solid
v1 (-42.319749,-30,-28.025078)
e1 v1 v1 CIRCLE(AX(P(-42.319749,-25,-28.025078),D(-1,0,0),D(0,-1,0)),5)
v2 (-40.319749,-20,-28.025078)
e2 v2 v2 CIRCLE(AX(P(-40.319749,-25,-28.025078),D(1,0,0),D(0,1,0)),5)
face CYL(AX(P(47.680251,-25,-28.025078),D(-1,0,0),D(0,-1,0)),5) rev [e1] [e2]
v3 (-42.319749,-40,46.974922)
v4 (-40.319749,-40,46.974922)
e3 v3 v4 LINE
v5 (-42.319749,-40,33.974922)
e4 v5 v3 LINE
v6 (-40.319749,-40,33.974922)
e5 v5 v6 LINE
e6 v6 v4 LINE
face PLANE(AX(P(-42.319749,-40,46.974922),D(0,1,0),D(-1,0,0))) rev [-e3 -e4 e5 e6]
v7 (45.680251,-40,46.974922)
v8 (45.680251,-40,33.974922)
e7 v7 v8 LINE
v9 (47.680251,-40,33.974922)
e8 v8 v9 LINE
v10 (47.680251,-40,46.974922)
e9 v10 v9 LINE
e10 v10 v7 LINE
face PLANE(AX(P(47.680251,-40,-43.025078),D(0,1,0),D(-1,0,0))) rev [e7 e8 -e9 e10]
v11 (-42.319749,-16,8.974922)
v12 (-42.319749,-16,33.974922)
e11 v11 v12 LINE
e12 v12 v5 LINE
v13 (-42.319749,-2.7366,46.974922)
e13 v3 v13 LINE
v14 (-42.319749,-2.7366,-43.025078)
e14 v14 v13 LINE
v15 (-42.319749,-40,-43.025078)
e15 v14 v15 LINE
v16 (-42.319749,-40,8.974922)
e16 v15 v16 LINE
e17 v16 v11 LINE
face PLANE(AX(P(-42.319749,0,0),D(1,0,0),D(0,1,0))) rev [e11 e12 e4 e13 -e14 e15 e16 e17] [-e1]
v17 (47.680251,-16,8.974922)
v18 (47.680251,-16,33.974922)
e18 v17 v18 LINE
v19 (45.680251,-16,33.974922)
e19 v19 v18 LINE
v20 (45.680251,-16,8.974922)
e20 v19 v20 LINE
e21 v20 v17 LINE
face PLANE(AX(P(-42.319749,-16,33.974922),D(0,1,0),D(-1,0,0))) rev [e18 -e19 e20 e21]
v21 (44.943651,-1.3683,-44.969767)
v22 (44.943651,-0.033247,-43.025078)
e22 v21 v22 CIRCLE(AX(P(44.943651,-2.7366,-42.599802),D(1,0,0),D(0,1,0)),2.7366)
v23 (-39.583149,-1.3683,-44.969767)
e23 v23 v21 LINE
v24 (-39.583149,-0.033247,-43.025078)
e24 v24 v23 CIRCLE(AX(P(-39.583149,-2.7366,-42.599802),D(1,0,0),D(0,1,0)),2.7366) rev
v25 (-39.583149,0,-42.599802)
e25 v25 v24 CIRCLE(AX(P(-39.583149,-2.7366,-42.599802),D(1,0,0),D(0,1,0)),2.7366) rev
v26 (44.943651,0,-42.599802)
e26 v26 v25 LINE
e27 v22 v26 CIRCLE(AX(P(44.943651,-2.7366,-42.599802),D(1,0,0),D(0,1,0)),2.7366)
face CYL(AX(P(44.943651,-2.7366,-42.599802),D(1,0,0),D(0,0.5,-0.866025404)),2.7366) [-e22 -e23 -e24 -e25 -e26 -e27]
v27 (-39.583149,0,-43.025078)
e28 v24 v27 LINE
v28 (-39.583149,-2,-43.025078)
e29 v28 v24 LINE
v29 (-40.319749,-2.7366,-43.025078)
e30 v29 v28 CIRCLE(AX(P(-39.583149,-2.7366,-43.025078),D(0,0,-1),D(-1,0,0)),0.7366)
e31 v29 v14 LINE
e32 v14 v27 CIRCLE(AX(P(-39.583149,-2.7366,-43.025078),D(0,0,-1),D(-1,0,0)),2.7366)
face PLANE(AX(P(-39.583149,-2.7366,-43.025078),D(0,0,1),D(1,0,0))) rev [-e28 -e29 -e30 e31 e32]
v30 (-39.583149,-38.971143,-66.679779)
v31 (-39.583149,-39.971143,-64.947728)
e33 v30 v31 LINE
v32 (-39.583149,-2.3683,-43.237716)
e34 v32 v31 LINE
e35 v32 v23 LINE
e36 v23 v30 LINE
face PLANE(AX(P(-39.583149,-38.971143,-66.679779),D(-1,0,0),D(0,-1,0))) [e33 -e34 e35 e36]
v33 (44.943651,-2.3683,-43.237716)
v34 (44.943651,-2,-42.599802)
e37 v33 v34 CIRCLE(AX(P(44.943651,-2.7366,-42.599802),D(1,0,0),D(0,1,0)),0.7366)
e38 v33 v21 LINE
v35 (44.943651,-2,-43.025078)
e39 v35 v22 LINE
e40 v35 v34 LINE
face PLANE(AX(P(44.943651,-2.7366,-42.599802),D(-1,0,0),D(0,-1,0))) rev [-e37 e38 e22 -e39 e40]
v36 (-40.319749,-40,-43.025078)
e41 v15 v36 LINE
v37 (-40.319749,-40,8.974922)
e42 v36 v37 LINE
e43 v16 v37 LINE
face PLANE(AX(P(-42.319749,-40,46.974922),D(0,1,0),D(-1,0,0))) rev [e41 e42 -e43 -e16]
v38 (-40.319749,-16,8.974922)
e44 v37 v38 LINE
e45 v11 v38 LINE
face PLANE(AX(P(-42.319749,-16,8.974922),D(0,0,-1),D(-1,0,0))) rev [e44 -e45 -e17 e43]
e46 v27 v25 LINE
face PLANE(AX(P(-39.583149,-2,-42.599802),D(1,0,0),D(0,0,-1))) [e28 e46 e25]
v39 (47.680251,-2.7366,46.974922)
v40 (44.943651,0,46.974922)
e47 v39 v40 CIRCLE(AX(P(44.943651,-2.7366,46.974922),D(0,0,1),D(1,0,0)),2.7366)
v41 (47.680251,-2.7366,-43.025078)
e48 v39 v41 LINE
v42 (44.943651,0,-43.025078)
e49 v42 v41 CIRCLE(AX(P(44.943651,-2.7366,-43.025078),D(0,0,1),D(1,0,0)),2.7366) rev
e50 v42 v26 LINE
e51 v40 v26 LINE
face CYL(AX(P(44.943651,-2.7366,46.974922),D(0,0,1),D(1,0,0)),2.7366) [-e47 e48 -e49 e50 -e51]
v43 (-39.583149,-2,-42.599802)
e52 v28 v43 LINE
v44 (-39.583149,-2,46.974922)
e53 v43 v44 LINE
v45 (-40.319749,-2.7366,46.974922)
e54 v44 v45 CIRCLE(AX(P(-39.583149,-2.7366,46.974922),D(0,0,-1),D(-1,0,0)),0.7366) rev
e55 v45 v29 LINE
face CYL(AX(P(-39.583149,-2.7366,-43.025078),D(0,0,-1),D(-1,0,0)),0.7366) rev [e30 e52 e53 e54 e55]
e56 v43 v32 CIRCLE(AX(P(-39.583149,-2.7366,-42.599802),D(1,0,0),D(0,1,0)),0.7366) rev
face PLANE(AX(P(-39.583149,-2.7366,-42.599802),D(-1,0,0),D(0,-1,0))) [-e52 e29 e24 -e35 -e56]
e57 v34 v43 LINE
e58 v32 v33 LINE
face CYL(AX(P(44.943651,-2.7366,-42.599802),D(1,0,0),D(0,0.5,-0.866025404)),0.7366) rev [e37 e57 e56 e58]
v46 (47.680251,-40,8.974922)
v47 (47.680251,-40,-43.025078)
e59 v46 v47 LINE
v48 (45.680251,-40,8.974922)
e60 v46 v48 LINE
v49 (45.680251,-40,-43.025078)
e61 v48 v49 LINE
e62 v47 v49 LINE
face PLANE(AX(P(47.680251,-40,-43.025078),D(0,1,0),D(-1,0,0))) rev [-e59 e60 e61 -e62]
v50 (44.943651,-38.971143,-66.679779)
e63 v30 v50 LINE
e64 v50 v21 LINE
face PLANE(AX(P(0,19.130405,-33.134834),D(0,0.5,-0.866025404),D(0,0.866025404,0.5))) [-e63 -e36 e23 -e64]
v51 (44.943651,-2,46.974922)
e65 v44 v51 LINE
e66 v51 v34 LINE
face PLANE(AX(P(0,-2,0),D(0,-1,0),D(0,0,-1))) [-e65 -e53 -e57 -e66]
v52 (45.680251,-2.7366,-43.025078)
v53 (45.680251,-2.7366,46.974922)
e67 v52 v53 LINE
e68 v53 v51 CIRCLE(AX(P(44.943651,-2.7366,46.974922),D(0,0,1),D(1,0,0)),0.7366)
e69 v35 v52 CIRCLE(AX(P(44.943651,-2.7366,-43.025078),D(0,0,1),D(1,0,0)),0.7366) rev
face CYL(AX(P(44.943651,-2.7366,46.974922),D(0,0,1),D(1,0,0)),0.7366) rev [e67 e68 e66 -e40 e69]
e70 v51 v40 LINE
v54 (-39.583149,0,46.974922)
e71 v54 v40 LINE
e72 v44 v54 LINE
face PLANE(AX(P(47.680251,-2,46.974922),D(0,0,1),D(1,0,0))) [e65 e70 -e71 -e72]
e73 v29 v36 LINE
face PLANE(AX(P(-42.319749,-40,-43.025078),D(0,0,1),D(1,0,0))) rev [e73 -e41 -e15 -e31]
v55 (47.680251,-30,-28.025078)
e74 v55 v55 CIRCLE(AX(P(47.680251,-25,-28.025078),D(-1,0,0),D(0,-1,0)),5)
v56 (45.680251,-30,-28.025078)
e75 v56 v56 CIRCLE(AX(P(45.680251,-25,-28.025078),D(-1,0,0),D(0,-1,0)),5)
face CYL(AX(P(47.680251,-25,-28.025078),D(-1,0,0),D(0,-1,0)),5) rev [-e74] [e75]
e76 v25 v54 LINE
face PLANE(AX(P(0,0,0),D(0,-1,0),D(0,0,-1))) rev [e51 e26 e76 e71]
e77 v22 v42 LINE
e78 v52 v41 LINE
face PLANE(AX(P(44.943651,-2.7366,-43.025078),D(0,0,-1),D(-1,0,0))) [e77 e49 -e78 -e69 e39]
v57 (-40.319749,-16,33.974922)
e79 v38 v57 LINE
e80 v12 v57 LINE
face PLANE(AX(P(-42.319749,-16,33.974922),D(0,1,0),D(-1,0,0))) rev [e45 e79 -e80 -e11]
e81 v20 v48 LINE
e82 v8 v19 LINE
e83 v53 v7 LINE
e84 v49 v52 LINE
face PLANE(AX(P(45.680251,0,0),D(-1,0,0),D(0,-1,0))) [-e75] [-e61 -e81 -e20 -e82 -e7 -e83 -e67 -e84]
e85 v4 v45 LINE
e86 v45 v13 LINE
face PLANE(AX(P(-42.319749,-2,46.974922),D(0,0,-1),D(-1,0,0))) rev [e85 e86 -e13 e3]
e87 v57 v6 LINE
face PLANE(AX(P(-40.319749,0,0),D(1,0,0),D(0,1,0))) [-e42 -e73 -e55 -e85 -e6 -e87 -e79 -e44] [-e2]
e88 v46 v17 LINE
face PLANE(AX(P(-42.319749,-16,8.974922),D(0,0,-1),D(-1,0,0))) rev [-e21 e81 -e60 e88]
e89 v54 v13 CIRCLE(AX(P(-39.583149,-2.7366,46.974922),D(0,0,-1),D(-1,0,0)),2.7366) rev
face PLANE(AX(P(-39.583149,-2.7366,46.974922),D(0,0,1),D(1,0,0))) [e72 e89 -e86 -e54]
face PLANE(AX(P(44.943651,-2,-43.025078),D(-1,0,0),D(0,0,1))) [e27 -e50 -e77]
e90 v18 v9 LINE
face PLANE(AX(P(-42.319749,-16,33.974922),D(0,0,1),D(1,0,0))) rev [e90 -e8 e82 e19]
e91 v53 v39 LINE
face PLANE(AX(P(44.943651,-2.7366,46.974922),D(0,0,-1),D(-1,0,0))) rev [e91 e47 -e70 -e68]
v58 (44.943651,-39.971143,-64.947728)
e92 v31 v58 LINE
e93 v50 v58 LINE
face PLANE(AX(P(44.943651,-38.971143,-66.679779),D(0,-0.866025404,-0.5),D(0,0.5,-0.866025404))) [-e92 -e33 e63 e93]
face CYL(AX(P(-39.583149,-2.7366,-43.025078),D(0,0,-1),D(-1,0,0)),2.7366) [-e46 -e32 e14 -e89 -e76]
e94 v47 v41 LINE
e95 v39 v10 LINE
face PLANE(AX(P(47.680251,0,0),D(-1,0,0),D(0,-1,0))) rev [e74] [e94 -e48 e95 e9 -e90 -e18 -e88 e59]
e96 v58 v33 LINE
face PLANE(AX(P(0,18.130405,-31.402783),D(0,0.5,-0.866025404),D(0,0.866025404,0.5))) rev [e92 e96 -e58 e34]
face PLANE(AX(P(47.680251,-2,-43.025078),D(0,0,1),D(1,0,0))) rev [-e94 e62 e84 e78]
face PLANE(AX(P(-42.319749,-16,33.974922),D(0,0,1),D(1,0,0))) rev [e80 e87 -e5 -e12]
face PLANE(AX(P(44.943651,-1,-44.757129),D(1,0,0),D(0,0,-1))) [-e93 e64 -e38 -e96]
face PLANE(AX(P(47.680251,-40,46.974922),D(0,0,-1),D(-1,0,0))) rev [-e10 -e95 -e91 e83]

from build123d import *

# Parameters (mm, degrees)
SKETCH1_W                    = 90
SKETCH1_H                    = 90
BASE_FLANGE1_DEPTH           = 2
EDGE_FLANGE1_STRIP_W         = 9.4732
EDGE_FLANGE1_STRIP_H         = 2
EDGE_FLANGE1_STRIP_CUT_DEPTH = 90
EDGE_FLANGE1_DEPTH           = 90
EDGE_FLANGE3_STRIP_W         = 9.4732
EDGE_FLANGE3_STRIP_H         = 2
EDGE_FLANGE3_STRIP_CUT_DEPTH = 90
EDGE_FLANGE3_DEPTH           = 90
EDGE_FLANGE5_STRIP_CUT_DEPTH = 84.5268
EDGE_FLANGE5_DEPTH           = 84.5268
SKETCH25_W                   = 25
SKETCH25_H                   = 24
CUT_EXTRUDE1_DEPTH           = 119.937769086
SKETCH26_R                   = 5
CUT_EXTRUDE2_DEPTH           = 119.937769086


# Sheet-metal steps are written as plain solids
with BuildPart() as part:
    # Sketch1 → Base-Flange1 (new body)
    with BuildSketch(Plane(origin=(0, 0, 0), x_dir=(1, 0, 0), z_dir=(0, 1, 0))):
        with Locations((2.680250784, -1.97492163)):
            Rectangle(SKETCH1_W, SKETCH1_H)
    extrude(amount=-BASE_FLANGE1_DEPTH)

    # Edge-Flange1 strip (across the edge) → Edge-Flange1 strip cut (cut)
    with BuildSketch(Plane(origin=(-42.319749216, -2, 46.97492163), x_dir=(1, 0, 0), z_dir=(0, 0, -1))):
        with Locations((-2, -1)):
            Rectangle(EDGE_FLANGE1_STRIP_W, EDGE_FLANGE1_STRIP_H)
    extrude(amount=EDGE_FLANGE1_STRIP_CUT_DEPTH, mode=Mode.SUBTRACT)

    # Edge-Flange1 section (across the edge) → Edge-Flange1 (add)
    with BuildSketch(Plane(origin=(-42.319749216, -2, 46.97492163), x_dir=(1, 0, 0), z_dir=(0, 0, -1))):
        with BuildLine():
            Line((0, 0.7366), (0, 38))
            Line((0, 38), (2, 38))
            Line((2, 38), (2, 0.7366))
            ThreePointArc((2, 0.7366), (2.215745145, 0.215745145), (2.7366, 0))
            Line((2.7366, 0), (2.7366, -2))
            ThreePointArc((2.7366, -2), (0.801531583, -1.198468417), (0, 0.7366))
        make_face()
    extrude(amount=EDGE_FLANGE1_DEPTH)

    # Edge-Flange3 strip (across the edge) → Edge-Flange3 strip cut (cut)
    with BuildSketch(Plane(origin=(47.680250784, -2, -43.02507837), x_dir=(-1, 0, 0), z_dir=(0, 0, 1))):
        with Locations((-2, -1)):
            Rectangle(EDGE_FLANGE3_STRIP_W, EDGE_FLANGE3_STRIP_H)
    extrude(amount=EDGE_FLANGE3_STRIP_CUT_DEPTH, mode=Mode.SUBTRACT)

    # Edge-Flange3 section (across the edge) → Edge-Flange3 (add)
    with BuildSketch(Plane(origin=(47.680250784, -2, -43.02507837), x_dir=(-1, 0, 0), z_dir=(0, 0, 1))):
        with BuildLine():
            Line((0, 0.7366), (0, 38))
            Line((0, 38), (2, 38))
            Line((2, 38), (2, 0.7366))
            ThreePointArc((2, 0.7366), (2.215745145, 0.215745145), (2.7366, 0))
            Line((2.7366, 0), (2.7366, -2))
            ThreePointArc((2.7366, -2), (0.801531583, -1.198468417), (0, 0.7366))
        make_face()
    extrude(amount=EDGE_FLANGE3_DEPTH)

    # Edge-Flange5 strip (across the edge) → Edge-Flange5 strip cut (cut)
    with BuildSketch(Plane(origin=(-39.583149216, -2, -43.02507837), x_dir=(0, -0.5000000000000041, 0.8660254037844364), z_dir=(1, 0, 0))):
        Polygon((-8.835731855, 2.791911088), (-0.6317, -1.944688912), (0.3683, -0.212638104), (-7.835731855, 4.523961896), align=None)
    extrude(amount=EDGE_FLANGE5_STRIP_CUT_DEPTH, mode=Mode.SUBTRACT)

    # Edge-Flange5 section (across the edge) → Edge-Flange5 (add)
    with BuildSketch(Plane(origin=(-39.583149216, -2, -43.02507837), x_dir=(0, -0.5000000000000041, 0.8660254037844364), z_dir=(1, 0, 0))):
        with BuildLine():
            Line((-2, 0.425276208), (-2, 43.845299462))
            Line((-2, 43.845299462), (0, 43.845299462))
            Line((0, 43.845299462), (0, 0.425276208))
            ThreePointArc((0, 0.425276208), (0.098685688, 0.056976208), (0.3683, -0.212638104))
            Line((0.3683, -0.212638104), (-0.6317, -1.944688912))
            ThreePointArc((-0.6317, -1.944688912), (-1.63336512, -0.943023792), (-2, 0.425276208))
        make_face()
    extrude(amount=EDGE_FLANGE5_DEPTH)

    # Sketch25 → Cut-Extrude1 (cut, through all)
    with BuildSketch(Plane(origin=(47.680250784, 0, 0), x_dir=(0, 0, -1), z_dir=(1, 0, 0))):
        with Locations((-21.47492163, -28)):
            Rectangle(SKETCH25_W, SKETCH25_H)
    extrude(amount=-CUT_EXTRUDE1_DEPTH, mode=Mode.SUBTRACT)

    # Sketch26 → Cut-Extrude2 (cut, through all)
    with BuildSketch(Plane.ZY.offset(42.319749216)):
        with Locations(Location((-28.02507837, -25, 0), (0, 0, 270))):
            Circle(SKETCH26_R)
    extrude(amount=-CUT_EXTRUDE2_DEPTH, mode=Mode.SUBTRACT)


solid = part.part
